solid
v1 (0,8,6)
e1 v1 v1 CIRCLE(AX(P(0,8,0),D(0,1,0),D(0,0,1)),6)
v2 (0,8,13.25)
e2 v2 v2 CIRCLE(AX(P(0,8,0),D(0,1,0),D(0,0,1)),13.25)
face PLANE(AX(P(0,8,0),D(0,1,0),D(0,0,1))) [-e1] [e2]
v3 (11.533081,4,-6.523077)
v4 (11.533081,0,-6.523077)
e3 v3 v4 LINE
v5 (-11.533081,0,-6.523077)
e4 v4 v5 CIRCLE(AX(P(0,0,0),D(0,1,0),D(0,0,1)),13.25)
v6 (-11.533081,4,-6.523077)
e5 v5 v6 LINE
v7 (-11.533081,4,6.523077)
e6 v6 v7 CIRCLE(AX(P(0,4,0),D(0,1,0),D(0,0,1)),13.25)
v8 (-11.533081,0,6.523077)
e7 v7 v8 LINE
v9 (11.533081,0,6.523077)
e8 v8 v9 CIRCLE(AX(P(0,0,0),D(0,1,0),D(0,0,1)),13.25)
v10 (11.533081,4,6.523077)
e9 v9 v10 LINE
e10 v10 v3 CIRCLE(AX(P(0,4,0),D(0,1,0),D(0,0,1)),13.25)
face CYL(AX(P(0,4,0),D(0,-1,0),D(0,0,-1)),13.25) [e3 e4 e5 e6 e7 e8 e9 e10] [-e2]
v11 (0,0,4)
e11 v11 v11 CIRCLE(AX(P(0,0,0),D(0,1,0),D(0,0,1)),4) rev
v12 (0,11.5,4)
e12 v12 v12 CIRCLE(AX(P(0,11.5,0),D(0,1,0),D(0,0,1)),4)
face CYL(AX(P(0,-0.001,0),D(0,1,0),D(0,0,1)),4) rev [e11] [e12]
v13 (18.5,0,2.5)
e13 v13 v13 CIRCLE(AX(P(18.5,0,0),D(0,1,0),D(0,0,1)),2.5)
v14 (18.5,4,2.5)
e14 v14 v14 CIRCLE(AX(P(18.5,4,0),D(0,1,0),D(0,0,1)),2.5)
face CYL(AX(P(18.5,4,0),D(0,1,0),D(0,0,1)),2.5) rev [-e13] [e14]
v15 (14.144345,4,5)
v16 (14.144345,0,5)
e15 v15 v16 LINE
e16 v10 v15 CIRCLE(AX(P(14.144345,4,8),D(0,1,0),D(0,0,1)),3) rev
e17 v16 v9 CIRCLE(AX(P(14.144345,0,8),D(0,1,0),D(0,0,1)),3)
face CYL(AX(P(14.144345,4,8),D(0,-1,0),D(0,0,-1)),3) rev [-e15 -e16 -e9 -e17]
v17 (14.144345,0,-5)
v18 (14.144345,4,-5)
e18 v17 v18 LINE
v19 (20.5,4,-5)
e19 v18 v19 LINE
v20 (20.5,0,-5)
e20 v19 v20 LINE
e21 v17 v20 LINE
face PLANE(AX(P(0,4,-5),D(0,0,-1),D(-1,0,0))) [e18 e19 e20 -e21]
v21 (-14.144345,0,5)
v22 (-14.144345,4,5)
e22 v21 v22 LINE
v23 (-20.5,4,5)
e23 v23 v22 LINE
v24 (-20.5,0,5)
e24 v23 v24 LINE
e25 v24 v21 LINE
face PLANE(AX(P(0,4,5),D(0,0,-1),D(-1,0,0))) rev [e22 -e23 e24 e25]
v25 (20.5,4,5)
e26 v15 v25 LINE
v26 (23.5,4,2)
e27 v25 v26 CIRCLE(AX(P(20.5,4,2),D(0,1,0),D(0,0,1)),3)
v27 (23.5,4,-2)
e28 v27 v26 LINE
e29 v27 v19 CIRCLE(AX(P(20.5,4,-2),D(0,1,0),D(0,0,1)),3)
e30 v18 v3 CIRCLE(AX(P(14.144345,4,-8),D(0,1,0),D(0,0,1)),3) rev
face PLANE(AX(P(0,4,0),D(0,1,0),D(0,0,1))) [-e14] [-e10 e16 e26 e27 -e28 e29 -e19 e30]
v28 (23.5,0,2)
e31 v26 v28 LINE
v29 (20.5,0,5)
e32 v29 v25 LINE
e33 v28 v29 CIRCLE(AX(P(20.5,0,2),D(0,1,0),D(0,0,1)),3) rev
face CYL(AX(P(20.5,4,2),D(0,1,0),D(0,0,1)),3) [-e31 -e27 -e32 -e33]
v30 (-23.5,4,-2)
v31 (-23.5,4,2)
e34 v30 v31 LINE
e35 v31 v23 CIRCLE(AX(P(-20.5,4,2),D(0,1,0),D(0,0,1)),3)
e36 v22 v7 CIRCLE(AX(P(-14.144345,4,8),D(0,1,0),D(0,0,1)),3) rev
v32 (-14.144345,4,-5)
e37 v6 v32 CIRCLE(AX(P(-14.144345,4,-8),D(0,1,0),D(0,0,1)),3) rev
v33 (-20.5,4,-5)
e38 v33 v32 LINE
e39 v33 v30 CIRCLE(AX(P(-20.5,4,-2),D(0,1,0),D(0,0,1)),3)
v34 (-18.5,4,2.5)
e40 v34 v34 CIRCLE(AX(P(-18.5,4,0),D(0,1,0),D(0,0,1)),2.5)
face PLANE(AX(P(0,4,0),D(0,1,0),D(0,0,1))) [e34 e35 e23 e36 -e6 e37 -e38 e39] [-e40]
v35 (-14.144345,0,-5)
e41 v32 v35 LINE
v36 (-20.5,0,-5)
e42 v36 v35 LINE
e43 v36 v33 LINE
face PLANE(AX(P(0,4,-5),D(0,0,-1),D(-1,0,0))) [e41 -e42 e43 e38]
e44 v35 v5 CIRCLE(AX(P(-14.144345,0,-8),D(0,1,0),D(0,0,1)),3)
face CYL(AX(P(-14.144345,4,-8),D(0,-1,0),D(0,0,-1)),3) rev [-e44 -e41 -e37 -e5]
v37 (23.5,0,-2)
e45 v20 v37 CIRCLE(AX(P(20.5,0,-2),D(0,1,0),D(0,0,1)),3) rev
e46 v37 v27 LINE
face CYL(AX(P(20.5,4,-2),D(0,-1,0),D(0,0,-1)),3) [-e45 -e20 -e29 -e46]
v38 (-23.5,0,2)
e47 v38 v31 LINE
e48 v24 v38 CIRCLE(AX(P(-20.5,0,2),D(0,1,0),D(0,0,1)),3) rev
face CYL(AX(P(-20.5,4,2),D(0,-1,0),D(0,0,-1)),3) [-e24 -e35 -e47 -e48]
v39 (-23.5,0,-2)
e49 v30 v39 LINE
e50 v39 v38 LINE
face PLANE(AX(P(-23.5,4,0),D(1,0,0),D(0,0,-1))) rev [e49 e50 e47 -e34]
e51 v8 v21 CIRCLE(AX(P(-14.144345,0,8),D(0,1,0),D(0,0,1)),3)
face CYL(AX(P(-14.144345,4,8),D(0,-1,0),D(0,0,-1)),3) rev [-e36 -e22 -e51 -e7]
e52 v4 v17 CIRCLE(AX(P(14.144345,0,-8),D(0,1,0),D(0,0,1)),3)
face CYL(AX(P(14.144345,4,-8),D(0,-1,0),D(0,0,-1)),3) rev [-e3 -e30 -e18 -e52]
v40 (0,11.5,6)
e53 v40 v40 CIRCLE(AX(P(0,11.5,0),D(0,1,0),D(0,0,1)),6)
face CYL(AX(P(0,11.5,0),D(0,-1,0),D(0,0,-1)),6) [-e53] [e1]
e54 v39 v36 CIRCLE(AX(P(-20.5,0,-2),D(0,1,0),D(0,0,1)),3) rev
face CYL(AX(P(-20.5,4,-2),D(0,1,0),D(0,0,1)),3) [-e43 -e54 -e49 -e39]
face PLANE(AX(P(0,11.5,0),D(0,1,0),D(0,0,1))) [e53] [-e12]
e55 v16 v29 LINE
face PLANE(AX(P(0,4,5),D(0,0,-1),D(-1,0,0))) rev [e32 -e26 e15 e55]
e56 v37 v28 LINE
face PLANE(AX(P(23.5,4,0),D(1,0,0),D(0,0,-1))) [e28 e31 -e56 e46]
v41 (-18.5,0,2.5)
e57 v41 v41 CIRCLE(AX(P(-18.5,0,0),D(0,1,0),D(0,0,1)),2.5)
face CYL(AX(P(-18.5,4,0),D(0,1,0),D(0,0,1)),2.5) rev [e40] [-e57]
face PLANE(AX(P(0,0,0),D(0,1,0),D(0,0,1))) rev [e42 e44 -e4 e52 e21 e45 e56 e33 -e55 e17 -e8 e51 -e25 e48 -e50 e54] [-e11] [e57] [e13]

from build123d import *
from build123d.topology import SkipClean

# Parameters (mm, degrees)
EXTRUDE_1_DEPTH     = 4
SKETCH_2_R          = 13.25
EXTRUDE_2_DEPTH     = 4
SKETCH_3_R          = 6
EXTRUDE_3_DEPTH     = 3.5
CUT_EXTRUDE_1_REACH = 31.327
SKETCH_4_R          = 4
FILLET_1_R          = 3
HOLE_WIZARD_1_D     = 5


with BuildPart() as part:
    # 草图1 → 凸台-拉伸1 (new body)
    with BuildSketch(Plane(origin=(0, 0, 0), x_dir=(1, 0, 0), z_dir=(0, 1, 0))):
        with BuildLine():
            Line((-3, 5), (-12.270391192, 5))
            ThreePointArc((-12.270391192, 5), (-13.25, 0), (-12.270391192, -5))
            Line((-12.270391192, -5), (-3, -5))
            Line((-3, -5), (-3, 5))
        make_face()
        with BuildLine():
            Line((-12.270391192, 5), (-23.5, 5))
            Line((-23.5, 5), (-23.5, -5))
            Line((-23.5, -5), (-12.270391192, -5))
            ThreePointArc((-12.270391192, -5), (-13.25, 0), (-12.270391192, 5))
        make_face()
        with BuildLine():
            ThreePointArc((12.270391192, 5), (0, 13.25), (-12.270391192, 5))
            Line((-12.270391192, 5), (-3, 5))
            Line((-3, 5), (-3, -5))
            Line((-3, -5), (-12.270391192, -5))
            ThreePointArc((-12.270391192, -5), (0, -13.25), (12.270391192, -5))
            Line((12.270391192, -5), (3, -5))
            Line((3, -5), (3, 5))
            Line((3, 5), (12.270391192, 5))
        make_face()
        with BuildLine():
            ThreePointArc((13.25, 0), (13.002791687, 2.547529853), (12.270391192, 5))
            Line((12.270391192, 5), (3, 5))
            Line((3, 5), (3, -5))
            Line((3, -5), (12.270391192, -5))
            ThreePointArc((12.270391192, -5), (13.002791687, -2.547529853), (13.25, 0))
        make_face()
        with BuildLine():
            Line((23.5, 5), (12.270391192, 5))
            ThreePointArc((12.270391192, 5), (13.002791687, 2.547529853), (13.25, 0))
            ThreePointArc((13.25, 0), (13.002791687, -2.547529853), (12.270391192, -5))
            Line((12.270391192, -5), (23.5, -5))
            Line((23.5, -5), (23.5, 5))
        make_face()
    extrude(amount=EXTRUDE_1_DEPTH)

    # 草图2 → 凸台-拉伸2 (add)
    with BuildSketch(Plane(origin=(0, 4, 0), x_dir=(1, 0, 0), z_dir=(0, 1, 0))):
        with Locations(Location((0, 0, 0), (0, 0, 22.170157164))):
            Circle(SKETCH_2_R)
    extrude(amount=EXTRUDE_2_DEPTH)

    # 草图3 → 凸台-拉伸3 (add)
    with SkipClean():  # the faces are left unmerged after this step: merging them gives an invalid solid
        with BuildSketch(Plane(origin=(0, 8, 0), x_dir=(1, 0, 0), z_dir=(0, 1, 0))):
            with Locations(Location((0, 0, 0), (0, 0, 270))):
                Circle(SKETCH_3_R)
        extrude(amount=EXTRUDE_3_DEPTH)

    # 草图4 → 切除-拉伸1 (cut, up to next)
    with BuildSketch(Plane(origin=(0, 11.5, 0), x_dir=(1, 0, 0), z_dir=(0, 1, 0)), mode=Mode.PRIVATE) as cut_extrude_1_sk1:
        with Locations(Location((0, 0, 0), (0, 0, 270))):
            Circle(SKETCH_4_R)
    cut_extrude_1_tool1 = extrude(cut_extrude_1_sk1.sketch, amount=-CUT_EXTRUDE_1_REACH, mode=Mode.PRIVATE) & part.part
    add(cut_extrude_1_tool1.solids().sort_by_distance((0, 11.5, 0))[0], mode=Mode.SUBTRACT)

    # 圆角1
    # the kernel refuses this fillet: 3 mm, written as the material it adds along each edge
    with BuildSketch(Plane(origin=(-12.270391192, 0, 5), x_dir=(-1, 0, 0), z_dir=(0, 1, 0))) as fillet_1_piece_1:
        with BuildLine():
            CenterArc((1.873953968, 3), FILLET_1_R, 209.492372675, 60.507627325)
            ThreePointArc((-0.737309754, 1.523076923), (-0.344316056, 0.773320696), (0, 0))
            Line((0, 0), (1.873953968, 0))
        make_face()
    extrude(amount=4)
    with BuildSketch(Plane(origin=(-12.270391192, 0, -5), x_dir=(0.43572231670003575, 0, -0.9000811423030447), z_dir=(0, 1, 0)), Plane(origin=(12.270391192, 0, 5), x_dir=(-0.4357223167001389, 0, 0.9000811423029949), z_dir=(0, 1, 0))) as fillet_1_piece_2:
        with BuildLine():
            CenterArc((1.883719863, 2.993877578), FILLET_1_R, 205.831264919, 60.507627325)
            Line((-0.816523564, 1.686710628), (0, 0))
            ThreePointArc((0, 0), (0.846077565, 0.027040696), (1.692155131, 0))
        make_face()
    extrude(amount=4)
    with BuildSketch(Plane(origin=(12.270391192, 0, -5), x_dir=(-0.43572231670013994, 0, -0.9000811423029943), z_dir=(0, 1, 0))) as fillet_1_piece_3:
        with BuildLine():
            CenterArc((1.883719863, -2.993877578), FILLET_1_R, 93.661107756, 60.507627325)
            Line((-0.816523564, -1.686710628), (0, 0))
            ThreePointArc((0, 0), (0.846077565, -0.027040696), (1.692155131, 0))
        make_face()
    extrude(amount=4)
    # the kernel refuses this fillet: 3 mm, written as the material it takes off along each edge
    with BuildSketch(Plane(origin=(-23.5, -7.5, 5), x_dir=(1, 0, 0), z_dir=(0, 1, 0)), Plane(origin=(23.5, -7.5, -5), x_dir=(-1, 0, 0), z_dir=(0, 1, 0)), Plane(origin=(23.5, -7.5, 5), x_dir=(0, 0, -1), z_dir=(0, 1, 0))) as fillet_1_2_piece_1:
        with BuildLine():
            CenterArc((FILLET_1_R, FILLET_1_R), FILLET_1_R, 180, 90)
            Line((0, FILLET_1_R), (0, 0))
            Line((0, 0), (FILLET_1_R, 0))
        make_face()
    extrude(amount=19, mode=Mode.SUBTRACT)
    with BuildSketch(Plane(origin=(-23.5, -7.5, -5), x_dir=(1, 0, 0), z_dir=(0, 1, 0))) as fillet_1_2_piece_2:
        with BuildLine():
            CenterArc((FILLET_1_R, -FILLET_1_R), FILLET_1_R, 90, 90)
            Line((0, -FILLET_1_R), (0, 0))
            Line((0, 0), (FILLET_1_R, 0))
        make_face()
    extrude(amount=19, mode=Mode.SUBTRACT)

    # 孔1 (through all)
    with Locations(Plane(origin=(0, 4, 0), x_dir=(1, 0, 0), z_dir=(0, 1, 0))):
        with Locations((-18.5, 0), (18.5, 0)):
            Hole(HOLE_WIZARD_1_D / 2)


solid = part.part
